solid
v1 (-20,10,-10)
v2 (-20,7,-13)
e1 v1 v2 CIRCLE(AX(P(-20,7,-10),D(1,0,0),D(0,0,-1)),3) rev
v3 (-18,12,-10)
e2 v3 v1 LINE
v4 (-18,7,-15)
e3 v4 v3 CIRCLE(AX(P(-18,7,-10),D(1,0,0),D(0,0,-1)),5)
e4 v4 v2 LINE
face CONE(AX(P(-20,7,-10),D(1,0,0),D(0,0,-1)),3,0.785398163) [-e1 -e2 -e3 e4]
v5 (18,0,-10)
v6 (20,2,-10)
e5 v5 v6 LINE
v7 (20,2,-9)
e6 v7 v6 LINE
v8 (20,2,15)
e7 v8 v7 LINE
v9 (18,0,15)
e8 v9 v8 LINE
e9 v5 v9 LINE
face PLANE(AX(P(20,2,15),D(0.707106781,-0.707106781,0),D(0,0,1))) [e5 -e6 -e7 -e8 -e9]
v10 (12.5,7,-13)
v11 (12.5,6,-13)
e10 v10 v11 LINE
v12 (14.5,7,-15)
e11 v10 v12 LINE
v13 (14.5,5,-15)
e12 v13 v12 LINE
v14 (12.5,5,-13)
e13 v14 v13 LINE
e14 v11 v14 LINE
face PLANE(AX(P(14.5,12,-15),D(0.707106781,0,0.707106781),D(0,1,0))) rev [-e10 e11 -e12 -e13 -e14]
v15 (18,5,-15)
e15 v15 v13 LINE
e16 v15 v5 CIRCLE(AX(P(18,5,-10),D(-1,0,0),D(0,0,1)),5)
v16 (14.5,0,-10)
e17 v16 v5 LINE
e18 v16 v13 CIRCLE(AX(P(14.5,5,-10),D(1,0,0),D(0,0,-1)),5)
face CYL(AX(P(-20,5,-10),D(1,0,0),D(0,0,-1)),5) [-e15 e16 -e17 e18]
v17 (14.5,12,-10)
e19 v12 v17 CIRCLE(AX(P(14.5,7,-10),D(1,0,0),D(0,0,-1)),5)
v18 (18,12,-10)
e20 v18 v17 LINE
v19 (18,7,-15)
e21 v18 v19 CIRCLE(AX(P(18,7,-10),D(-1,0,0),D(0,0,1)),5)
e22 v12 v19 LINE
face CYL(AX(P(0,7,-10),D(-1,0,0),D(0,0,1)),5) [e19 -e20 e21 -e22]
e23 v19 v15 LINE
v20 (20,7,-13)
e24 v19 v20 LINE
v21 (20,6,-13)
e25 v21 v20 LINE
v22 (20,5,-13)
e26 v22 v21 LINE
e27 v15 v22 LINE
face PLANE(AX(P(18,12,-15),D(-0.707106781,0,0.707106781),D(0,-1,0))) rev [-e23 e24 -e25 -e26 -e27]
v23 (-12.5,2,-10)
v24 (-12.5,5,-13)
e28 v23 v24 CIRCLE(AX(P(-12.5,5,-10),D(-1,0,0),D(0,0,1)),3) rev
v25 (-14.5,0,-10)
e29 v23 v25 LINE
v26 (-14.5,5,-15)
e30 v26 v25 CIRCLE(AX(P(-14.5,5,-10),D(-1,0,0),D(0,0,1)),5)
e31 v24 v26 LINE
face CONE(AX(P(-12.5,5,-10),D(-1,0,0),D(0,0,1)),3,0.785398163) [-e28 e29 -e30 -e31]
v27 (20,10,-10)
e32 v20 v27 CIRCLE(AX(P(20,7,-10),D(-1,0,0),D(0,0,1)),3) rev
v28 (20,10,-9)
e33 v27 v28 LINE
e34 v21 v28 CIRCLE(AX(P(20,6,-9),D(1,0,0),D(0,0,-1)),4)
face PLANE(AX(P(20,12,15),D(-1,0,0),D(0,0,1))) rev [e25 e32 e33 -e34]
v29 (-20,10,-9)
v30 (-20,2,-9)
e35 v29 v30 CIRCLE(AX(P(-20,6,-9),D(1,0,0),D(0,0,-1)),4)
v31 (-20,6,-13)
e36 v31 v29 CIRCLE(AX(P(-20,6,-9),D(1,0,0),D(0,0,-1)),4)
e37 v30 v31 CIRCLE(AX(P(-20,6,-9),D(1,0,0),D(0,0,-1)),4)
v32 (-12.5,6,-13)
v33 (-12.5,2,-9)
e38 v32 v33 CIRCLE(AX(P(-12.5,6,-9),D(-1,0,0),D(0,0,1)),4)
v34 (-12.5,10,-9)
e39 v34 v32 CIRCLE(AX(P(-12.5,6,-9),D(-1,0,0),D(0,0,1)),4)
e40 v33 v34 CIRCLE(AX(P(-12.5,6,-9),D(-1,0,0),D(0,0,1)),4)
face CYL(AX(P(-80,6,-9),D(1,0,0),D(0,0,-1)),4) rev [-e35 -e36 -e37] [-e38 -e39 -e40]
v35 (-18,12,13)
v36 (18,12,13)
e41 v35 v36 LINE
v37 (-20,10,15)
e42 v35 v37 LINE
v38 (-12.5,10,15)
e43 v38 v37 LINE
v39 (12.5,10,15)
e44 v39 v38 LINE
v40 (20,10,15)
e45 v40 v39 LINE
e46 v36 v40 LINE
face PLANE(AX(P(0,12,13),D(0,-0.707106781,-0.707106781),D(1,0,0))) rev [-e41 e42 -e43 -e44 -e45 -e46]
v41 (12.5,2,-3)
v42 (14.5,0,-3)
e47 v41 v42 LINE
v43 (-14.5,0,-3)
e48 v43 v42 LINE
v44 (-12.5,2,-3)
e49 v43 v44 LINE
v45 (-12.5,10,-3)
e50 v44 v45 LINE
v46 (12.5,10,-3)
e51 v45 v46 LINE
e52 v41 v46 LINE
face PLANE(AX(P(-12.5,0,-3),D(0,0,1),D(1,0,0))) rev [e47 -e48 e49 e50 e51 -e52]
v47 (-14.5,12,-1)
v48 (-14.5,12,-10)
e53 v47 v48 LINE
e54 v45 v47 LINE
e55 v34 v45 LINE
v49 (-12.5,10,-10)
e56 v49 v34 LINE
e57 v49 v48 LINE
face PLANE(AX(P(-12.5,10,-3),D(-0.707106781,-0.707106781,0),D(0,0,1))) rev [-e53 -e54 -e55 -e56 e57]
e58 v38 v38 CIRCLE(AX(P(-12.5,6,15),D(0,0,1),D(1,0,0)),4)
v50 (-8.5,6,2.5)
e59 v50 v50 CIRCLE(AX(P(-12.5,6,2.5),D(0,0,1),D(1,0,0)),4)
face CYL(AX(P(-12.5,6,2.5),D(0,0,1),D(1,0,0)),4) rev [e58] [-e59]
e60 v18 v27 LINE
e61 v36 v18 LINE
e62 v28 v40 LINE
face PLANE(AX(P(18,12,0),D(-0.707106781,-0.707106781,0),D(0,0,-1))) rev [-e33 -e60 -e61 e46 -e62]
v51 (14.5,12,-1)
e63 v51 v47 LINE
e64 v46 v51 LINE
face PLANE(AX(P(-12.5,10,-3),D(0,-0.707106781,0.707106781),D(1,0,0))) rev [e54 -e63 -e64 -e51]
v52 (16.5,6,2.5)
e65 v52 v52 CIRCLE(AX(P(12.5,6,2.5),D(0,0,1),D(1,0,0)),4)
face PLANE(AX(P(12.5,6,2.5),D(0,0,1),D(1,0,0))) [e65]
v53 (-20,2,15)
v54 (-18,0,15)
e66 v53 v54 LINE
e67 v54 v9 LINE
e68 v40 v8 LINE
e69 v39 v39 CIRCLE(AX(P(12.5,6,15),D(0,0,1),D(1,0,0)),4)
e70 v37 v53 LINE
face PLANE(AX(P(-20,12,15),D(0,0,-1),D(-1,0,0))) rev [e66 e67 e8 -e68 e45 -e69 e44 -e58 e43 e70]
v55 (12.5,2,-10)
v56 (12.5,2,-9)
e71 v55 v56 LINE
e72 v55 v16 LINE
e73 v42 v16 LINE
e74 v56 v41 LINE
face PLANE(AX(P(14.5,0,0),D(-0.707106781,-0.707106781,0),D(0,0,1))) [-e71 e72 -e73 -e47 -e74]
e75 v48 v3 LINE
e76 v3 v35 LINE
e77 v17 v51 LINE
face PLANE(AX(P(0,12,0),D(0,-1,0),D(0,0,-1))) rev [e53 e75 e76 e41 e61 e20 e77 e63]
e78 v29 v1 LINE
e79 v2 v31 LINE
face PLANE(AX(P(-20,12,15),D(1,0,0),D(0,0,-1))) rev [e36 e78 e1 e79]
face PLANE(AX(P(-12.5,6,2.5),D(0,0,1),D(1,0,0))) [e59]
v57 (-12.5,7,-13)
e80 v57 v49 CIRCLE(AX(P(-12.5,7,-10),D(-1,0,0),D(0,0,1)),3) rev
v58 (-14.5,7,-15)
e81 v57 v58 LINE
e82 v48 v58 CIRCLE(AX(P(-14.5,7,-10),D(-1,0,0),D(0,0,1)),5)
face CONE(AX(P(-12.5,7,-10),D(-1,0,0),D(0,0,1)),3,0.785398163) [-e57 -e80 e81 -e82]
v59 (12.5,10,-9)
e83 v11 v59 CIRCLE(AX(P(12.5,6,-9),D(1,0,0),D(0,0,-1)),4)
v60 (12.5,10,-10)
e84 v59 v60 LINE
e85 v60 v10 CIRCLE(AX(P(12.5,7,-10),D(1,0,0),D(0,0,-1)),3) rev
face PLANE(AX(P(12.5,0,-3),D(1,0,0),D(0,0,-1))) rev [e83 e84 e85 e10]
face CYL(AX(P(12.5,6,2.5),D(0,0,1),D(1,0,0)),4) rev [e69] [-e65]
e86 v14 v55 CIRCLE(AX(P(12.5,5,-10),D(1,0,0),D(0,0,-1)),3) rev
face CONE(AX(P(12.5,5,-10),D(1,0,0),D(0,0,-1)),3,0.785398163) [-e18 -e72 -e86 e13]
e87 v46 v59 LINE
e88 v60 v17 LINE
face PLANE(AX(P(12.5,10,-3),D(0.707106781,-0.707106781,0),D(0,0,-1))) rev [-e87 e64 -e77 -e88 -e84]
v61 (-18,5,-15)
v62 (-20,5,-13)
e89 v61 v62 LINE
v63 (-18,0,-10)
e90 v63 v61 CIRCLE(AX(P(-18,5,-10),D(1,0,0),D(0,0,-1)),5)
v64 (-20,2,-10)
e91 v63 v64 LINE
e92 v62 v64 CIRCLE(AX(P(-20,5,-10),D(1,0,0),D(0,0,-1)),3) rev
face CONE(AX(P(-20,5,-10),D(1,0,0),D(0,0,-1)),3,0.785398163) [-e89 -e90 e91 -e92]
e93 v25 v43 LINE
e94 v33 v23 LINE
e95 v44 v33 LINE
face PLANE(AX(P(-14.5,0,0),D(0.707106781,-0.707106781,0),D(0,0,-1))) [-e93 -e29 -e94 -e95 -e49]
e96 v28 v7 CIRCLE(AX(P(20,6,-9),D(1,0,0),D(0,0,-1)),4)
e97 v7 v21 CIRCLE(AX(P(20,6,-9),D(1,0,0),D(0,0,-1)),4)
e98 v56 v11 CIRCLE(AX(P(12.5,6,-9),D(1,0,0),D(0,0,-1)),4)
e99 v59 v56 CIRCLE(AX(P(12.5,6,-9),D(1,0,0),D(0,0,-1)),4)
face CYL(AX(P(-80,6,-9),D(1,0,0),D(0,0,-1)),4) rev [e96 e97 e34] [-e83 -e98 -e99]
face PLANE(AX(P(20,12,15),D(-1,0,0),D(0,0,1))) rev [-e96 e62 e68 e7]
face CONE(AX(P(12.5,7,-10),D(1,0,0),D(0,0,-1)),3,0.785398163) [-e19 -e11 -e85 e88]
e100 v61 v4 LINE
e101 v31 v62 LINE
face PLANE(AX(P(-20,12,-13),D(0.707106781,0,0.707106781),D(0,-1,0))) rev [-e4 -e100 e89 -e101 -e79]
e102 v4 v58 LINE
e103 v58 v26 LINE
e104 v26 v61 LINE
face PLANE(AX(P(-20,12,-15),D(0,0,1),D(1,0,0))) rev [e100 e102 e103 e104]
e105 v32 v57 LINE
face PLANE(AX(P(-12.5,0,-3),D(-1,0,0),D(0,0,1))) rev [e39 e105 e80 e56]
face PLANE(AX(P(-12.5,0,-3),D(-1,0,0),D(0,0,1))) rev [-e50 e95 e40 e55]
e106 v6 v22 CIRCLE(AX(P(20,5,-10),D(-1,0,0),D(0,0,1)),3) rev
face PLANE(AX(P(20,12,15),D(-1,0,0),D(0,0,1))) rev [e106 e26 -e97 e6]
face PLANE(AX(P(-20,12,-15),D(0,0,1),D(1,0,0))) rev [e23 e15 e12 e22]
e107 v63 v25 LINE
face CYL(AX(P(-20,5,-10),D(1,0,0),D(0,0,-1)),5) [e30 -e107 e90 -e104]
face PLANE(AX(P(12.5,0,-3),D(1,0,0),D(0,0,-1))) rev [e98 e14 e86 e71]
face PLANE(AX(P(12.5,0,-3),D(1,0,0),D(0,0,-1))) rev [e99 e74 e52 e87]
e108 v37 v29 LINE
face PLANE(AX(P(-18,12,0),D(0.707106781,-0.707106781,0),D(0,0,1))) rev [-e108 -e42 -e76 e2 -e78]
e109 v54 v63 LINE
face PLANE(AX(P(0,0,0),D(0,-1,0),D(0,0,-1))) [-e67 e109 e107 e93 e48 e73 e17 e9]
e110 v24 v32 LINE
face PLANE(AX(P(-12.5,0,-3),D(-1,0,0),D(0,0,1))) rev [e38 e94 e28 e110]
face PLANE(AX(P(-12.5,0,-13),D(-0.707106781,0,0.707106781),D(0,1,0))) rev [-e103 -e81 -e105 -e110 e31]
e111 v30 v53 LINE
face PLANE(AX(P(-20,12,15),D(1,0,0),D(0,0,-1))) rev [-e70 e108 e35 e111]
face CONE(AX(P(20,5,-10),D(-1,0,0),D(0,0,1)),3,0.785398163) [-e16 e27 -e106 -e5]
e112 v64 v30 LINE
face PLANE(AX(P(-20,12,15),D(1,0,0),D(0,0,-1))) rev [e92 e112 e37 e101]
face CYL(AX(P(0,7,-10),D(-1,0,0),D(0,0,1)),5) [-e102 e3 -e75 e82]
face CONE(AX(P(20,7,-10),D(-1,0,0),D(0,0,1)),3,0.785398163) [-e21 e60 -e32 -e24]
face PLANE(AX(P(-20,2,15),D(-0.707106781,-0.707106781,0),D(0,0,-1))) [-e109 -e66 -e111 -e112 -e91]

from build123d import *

# Parameters (mm, degrees)
SKETCH1_W           = 40
SKETCH1_H           = 30
BOSS_EXTRUDE1_DEPTH = 12
SKETCH2_W           = 25
SKETCH2_H           = 12
CUT_EXTRUDE1_DEPTH  = 12
SKETCH3_R           = 4
CUT_EXTRUDE2_DEPTH  = 100
FILLET1_R           = 5
SKETCH4_R           = 4
CUT_EXTRUDE3_DEPTH  = 12.5
CHAMFER1_SIZE       = 2


with BuildPart() as part:
    # Sketch1 → Boss-Extrude1 (new body)
    with BuildSketch(Plane(origin=(0, 0, 0), x_dir=(1, 0, 0), z_dir=(0, 1, 0))):
        Rectangle(SKETCH1_W, SKETCH1_H)
    extrude(amount=BOSS_EXTRUDE1_DEPTH)

    # Sketch2 → Cut-Extrude1 (cut)
    with BuildSketch(Plane(origin=(0, 12, 0), x_dir=(1, 0, 0), z_dir=(0, 1, 0))):
        with Locations((0, 9)):
            Rectangle(SKETCH2_W, SKETCH2_H)
    extrude(amount=-CUT_EXTRUDE1_DEPTH, mode=Mode.SUBTRACT)

    # Sketch3 → Cut-Extrude2 (cut)
    with BuildSketch(Plane(origin=(20, 0, 0), x_dir=(0, 0, -1), z_dir=(1, 0, 0))):
        with Locations((9, 6)):
            Circle(SKETCH3_R)
    extrude(amount=-CUT_EXTRUDE2_DEPTH, mode=Mode.SUBTRACT)

    # Fillet1
    fillet1_edges = [part.edges().sort_by_distance(p)[0] for p in [
        (-16.25, 0, -15),
        (-16.25, 12, -15),
        (16.25, 0, -15),
        (16.25, 12, -15),
    ]]
    fillet(fillet1_edges, radius=FILLET1_R)

    # Sketch4 → Cut-Extrude3 (cut)
    with BuildSketch(Plane.XY.offset(15)):
        with Locations((-12.5, 6)):
            Circle(SKETCH4_R)
        with Locations((12.5, 6)):
            Circle(SKETCH4_R)
    extrude(amount=-CUT_EXTRUDE3_DEPTH, mode=Mode.SUBTRACT)

    # Chamfer1
    chamfer1_edges = [part.edges().sort_by_distance(p)[0] for p in [
        (0, 12, 15),
        (12.5, 0, -6.5),
        (12.5, 12, -6.5),
        (0, 12, -3),
        (-12.5, 6, -15),
        (-20, 6, -15),
        (20, 12, 2.5),
        (-20, 0, 2.5),
        (-20, 12, 2.5),
        (-20, 10.535533906, -13.535533906),
        (-20, 1.464466094, -13.535533906),
        (-12.5, 0, -6.5),
        (-12.5, 12, -6.5),
        (-12.5, 10.535533906, -13.535533906),
        (-12.5, 1.464466094, -13.535533906),
        (12.5, 6, -15),
        (20, 6, -15),
        (12.5, 10.535533906, -13.535533906),
        (12.5, 1.464466094, -13.535533906),
        (20, 10.535533906, -13.535533906),
        (20, 1.464466094, -13.535533906),
        (20, 0, 2.5),
    ]]
    chamfer(chamfer1_edges, length=CHAMFER1_SIZE - 0.0001)  # a hair under: the kernel refuses the full size


solid = part.part
